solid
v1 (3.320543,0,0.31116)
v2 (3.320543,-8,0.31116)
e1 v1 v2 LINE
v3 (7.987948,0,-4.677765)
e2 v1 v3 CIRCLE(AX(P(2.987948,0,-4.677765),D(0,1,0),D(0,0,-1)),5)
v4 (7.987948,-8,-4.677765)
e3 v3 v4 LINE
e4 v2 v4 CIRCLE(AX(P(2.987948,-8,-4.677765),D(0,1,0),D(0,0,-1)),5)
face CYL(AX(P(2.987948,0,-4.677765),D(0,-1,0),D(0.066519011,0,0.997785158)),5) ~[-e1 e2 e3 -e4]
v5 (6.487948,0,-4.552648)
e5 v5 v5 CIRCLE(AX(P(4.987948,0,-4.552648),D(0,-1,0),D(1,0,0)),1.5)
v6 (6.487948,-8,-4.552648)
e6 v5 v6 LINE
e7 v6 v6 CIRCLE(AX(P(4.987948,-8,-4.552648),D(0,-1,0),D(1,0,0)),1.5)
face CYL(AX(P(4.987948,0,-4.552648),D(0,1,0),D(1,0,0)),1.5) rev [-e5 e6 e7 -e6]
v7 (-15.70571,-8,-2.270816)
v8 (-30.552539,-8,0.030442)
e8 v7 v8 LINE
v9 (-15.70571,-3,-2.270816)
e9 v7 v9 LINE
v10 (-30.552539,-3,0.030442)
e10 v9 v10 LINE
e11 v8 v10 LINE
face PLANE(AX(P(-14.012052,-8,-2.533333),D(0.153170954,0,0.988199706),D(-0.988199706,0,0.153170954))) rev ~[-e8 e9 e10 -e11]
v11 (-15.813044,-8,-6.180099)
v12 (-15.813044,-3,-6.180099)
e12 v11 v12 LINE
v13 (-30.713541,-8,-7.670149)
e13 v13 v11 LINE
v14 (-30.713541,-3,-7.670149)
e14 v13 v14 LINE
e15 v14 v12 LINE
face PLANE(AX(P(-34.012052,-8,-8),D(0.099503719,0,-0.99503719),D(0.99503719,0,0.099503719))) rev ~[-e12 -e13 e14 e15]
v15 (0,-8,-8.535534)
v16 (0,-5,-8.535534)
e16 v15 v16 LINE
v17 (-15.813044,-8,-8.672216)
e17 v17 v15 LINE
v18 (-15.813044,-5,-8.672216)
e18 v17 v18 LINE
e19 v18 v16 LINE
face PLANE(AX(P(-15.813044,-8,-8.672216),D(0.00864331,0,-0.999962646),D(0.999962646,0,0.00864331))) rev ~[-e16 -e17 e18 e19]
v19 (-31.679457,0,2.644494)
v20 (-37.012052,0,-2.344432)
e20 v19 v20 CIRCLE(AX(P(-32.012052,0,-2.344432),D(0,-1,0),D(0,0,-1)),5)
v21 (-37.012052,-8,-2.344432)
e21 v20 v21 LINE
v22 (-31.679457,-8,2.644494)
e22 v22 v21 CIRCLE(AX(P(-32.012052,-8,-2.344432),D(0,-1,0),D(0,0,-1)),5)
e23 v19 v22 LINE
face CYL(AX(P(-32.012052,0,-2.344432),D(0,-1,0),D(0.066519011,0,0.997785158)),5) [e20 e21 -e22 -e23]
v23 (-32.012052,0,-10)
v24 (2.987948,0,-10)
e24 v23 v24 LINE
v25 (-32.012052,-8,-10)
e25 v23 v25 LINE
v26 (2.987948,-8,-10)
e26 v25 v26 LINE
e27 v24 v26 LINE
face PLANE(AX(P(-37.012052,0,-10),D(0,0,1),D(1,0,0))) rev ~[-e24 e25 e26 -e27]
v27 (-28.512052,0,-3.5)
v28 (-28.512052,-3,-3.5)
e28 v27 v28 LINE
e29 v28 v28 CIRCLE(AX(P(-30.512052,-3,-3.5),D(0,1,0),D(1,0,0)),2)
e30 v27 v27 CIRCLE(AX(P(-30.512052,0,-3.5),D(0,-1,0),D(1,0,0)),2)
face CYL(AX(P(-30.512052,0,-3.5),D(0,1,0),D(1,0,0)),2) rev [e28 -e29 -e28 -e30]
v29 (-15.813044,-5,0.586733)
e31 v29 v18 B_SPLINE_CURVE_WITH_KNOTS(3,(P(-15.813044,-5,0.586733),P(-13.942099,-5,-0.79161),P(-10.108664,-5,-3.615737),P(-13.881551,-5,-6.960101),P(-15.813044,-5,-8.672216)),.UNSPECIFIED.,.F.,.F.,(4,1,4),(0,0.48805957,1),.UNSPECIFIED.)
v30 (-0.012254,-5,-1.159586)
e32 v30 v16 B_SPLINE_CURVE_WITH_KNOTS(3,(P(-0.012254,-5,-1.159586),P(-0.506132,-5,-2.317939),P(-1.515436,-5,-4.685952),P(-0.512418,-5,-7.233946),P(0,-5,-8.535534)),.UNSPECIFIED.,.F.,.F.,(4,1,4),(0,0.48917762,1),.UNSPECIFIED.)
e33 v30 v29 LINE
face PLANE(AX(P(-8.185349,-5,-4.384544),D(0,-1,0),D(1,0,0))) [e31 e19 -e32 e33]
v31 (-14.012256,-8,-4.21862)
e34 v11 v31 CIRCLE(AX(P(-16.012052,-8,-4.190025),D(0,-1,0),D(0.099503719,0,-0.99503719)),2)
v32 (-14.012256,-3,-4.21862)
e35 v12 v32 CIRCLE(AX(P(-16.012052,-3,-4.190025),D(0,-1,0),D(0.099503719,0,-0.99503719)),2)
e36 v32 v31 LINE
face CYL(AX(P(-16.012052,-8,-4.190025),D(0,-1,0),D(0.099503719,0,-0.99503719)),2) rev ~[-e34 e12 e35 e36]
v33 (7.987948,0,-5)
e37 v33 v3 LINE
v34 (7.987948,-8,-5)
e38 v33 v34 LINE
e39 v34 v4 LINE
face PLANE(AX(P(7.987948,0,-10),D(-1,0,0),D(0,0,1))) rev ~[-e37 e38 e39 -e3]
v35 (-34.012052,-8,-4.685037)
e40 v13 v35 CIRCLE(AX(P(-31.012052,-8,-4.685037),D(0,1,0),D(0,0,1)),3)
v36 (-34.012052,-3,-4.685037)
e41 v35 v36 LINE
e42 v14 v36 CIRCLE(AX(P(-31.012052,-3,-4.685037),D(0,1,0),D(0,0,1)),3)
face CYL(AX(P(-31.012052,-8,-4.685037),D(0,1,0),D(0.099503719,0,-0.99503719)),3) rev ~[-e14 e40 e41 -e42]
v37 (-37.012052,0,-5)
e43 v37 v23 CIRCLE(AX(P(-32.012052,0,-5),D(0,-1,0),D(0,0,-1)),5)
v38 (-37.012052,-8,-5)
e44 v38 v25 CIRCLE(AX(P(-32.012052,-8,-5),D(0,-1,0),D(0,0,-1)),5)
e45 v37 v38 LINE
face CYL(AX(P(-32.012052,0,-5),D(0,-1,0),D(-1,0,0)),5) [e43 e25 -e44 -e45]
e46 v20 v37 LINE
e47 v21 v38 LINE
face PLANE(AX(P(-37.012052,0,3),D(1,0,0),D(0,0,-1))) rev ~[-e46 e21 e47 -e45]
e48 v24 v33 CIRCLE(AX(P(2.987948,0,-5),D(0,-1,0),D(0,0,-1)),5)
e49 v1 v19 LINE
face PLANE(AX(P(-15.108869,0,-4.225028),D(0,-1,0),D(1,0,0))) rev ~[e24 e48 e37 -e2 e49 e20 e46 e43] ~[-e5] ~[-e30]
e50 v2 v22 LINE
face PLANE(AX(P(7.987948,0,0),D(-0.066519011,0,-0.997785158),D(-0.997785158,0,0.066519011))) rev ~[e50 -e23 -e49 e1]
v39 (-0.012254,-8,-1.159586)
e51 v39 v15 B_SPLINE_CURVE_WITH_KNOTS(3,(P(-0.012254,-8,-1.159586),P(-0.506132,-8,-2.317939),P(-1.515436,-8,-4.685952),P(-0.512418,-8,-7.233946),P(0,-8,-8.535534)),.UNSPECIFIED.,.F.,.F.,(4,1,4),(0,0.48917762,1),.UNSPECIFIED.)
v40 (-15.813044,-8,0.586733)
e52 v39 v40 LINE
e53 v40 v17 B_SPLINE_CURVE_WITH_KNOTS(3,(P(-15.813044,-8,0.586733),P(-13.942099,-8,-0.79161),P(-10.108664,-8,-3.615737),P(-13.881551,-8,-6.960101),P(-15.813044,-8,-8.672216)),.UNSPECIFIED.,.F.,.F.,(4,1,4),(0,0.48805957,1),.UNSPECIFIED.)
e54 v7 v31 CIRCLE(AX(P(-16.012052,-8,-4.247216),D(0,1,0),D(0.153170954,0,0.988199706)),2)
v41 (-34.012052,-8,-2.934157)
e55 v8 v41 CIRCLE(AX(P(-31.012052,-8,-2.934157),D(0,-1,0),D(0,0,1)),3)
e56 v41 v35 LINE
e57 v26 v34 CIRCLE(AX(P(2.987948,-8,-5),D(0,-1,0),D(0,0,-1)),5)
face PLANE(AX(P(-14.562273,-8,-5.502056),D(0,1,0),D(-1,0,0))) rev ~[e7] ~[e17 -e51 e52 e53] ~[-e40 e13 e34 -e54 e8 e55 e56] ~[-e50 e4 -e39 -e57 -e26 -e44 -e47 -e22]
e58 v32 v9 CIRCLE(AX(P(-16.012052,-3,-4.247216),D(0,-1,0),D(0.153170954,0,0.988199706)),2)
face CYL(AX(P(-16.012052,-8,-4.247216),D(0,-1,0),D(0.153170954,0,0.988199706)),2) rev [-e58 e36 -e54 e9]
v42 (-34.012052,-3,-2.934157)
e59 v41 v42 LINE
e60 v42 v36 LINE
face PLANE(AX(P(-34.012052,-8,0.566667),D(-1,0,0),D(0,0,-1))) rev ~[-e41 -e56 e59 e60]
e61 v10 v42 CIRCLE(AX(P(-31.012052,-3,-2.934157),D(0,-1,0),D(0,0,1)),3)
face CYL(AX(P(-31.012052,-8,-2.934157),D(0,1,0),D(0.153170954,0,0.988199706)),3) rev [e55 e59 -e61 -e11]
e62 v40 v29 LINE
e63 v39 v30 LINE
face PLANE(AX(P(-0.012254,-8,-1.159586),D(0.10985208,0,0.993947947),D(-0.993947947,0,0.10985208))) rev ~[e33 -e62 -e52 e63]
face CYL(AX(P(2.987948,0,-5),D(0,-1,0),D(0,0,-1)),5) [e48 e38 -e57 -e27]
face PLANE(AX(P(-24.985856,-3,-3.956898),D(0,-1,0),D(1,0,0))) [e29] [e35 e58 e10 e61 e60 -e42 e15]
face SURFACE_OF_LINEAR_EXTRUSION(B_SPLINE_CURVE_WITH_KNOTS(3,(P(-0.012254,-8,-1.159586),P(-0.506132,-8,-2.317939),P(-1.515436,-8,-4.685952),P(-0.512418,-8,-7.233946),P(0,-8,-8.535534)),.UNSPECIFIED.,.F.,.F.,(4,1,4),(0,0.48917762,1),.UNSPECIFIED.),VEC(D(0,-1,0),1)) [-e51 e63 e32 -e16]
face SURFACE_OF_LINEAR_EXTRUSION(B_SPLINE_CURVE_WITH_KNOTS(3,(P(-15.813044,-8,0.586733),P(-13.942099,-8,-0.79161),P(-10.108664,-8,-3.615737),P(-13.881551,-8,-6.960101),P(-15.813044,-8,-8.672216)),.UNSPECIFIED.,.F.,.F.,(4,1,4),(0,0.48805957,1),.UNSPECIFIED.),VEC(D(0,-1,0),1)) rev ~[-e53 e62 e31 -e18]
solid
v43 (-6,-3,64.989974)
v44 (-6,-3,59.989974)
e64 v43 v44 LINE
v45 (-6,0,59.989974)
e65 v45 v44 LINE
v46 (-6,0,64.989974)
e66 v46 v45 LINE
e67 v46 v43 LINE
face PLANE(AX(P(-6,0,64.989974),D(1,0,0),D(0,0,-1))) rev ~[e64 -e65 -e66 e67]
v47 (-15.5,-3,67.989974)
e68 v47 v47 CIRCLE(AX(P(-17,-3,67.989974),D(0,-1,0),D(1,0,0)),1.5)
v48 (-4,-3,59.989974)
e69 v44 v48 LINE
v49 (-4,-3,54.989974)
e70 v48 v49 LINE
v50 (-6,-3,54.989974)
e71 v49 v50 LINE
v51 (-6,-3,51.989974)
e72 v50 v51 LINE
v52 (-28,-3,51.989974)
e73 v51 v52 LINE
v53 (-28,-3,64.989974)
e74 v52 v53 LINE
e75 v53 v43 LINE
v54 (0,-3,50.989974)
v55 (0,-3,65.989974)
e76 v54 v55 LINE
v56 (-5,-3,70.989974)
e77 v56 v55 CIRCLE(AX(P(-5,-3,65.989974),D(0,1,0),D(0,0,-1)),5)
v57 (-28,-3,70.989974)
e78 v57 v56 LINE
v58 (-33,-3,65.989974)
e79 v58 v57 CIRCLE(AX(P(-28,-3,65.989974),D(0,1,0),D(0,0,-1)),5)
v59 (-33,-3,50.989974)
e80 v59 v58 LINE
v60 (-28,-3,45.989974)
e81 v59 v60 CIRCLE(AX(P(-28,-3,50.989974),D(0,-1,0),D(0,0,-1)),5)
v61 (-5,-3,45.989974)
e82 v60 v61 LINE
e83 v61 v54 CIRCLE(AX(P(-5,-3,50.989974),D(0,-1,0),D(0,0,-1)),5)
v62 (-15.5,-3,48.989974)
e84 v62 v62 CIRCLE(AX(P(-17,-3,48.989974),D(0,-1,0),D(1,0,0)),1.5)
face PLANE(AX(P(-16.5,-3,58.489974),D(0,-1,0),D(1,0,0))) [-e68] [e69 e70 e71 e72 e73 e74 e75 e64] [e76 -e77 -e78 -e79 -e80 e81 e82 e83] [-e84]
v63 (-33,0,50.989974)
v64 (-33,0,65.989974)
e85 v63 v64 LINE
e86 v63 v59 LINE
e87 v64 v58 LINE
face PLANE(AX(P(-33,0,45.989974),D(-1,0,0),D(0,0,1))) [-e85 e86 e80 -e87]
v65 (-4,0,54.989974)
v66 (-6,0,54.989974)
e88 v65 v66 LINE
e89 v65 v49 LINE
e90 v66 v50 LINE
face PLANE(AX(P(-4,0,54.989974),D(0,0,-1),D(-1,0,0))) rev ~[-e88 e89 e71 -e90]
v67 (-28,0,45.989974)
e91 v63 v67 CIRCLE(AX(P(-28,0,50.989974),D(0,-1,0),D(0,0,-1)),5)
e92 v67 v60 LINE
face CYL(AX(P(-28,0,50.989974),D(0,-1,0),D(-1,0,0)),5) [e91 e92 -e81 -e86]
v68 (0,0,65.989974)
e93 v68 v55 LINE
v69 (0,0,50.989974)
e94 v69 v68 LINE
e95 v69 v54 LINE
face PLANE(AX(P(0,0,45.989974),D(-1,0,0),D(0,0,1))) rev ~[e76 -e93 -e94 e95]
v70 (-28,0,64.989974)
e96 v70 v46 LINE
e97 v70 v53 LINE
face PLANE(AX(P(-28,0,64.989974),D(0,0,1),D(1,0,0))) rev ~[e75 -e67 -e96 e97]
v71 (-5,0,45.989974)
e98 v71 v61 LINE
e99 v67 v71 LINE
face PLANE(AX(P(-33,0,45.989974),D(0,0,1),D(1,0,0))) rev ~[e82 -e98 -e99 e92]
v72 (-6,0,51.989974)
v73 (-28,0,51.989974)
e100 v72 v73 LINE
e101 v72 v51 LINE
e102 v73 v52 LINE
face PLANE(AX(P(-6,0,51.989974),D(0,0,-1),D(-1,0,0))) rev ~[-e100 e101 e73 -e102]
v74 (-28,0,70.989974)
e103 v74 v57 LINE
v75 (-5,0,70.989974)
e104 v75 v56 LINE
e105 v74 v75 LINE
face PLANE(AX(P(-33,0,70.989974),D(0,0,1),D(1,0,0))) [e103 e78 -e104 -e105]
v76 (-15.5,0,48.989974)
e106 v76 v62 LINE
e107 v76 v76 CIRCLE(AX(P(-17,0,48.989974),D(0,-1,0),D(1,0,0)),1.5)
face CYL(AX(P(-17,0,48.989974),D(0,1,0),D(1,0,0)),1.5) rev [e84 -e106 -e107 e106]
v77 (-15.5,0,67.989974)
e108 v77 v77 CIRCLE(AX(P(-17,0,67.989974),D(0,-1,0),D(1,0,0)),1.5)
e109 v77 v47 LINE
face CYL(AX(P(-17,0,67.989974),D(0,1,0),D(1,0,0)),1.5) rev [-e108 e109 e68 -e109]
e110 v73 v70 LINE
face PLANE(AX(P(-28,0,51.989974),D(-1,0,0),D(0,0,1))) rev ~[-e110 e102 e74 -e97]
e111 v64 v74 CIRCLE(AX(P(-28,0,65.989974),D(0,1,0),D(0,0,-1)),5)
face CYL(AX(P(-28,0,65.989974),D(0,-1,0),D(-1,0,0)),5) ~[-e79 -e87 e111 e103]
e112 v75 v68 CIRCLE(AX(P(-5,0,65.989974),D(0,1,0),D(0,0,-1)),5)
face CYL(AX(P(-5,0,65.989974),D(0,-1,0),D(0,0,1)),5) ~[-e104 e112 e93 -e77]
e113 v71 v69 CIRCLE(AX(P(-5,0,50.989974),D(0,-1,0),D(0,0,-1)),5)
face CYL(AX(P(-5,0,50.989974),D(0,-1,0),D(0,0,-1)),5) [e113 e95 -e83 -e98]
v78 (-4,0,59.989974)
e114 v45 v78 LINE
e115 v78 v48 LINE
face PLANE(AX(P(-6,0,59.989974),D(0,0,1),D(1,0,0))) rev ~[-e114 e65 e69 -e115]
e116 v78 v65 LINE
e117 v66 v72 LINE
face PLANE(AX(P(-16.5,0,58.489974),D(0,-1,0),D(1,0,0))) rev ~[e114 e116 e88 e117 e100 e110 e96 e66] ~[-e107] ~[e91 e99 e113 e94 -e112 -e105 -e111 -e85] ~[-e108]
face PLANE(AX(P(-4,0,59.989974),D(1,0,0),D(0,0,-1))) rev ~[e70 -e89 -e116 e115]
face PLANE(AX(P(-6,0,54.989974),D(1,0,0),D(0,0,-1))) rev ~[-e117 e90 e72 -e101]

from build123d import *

# Parameters (mm, degrees)
F0_R        = 1.5
F0_R_2      = 2
F1_DEPTH    = 8
F2_R        = 5
F3_R        = 5
F5_DEPTH    = 5
F6_R        = 3
F7_T4_DEPTH = 9.2847060191
F7_T9_DEPTH = 9.5249378106
F9_DEPTH    = 3
F10_W       = 33
F10_H       = 25
F10_R       = 1.5
F11_DEPTH   = 3
F12_R       = 5


# Not quite as in the source:
# - a fillet or chamfer that OpenCascade refuses, or shapes differently, is made with other operations: its cross-section is extruded or revolved along the edge and cut away or added


with BuildPart() as f1:
    # F0 (on Front) → F1 (new body)
    with BuildSketch(Plane.XZ):
        Polygon((-37.012051791, 3), (-37.012051791, -10), (7.987948209, -10), (7.987948209, 0), align=None)
        with Locations((4.987948209, -4.5526479371)):
            Circle(F0_R, mode=Mode.SUBTRACT)
        with Locations((-30.512051791, -3.5)):
            Circle(F0_R_2, mode=Mode.SUBTRACT)
    extrude(amount=F1_DEPTH)

    # F2
    f2_edges = [f1.edges().sort_by_distance(p)[0] for p in [
        (7.987948, -4, 0),
        (7.987948, -4, -10),
    ]]
    fillet(f2_edges, radius=F2_R)

    # F3
    f3_edges = [f1.edges().sort_by_distance(p)[0] for p in [
        (-37.012052, -4, 3),
        (-37.012052, -4, -10),
    ]]
    fillet(f3_edges, radius=F3_R)

    # F4 (on face) → F5 (cut)
    with BuildSketch(Plane.XZ.offset(8)):
        Polygon((-34.012051791, -8), (-14.012051791, -6), (-14.012051791, -2.5333333333), (-34.012051791, 0.5666666667), align=None)
    extrude(amount=-F5_DEPTH, mode=Mode.SUBTRACT)

    # F6
    f6_edges = [f1.edges().sort_by_distance(p)[0] for p in [
        (-34.012052, -5.5, 0.566667),
        (-34.012052, -5.5, -8),
    ]]
    fillet(f6_edges, radius=F6_R)

    # F7: fillet of radius 2 on 2 edges, made by hand


with BuildPart() as f7_tool2:
    # F7_s3 → F7_t4 (new body)
    with BuildSketch(Plane.XZ.offset(8)):
        with BuildLine():
            ThreePointArc((-15.7057098821, -2.2708163292), (-14.493387276, -2.9458095434), (-14.012051791, -4.247215741))
            Line((-14.012051791, -4.247215741), (-14.012051791, -2.5333333333))
            Line((-14.012051791, -2.5333333333), (-15.7057098821, -2.2708163292))
        make_face()
    extrude(amount=-F7_T4_DEPTH)

    split(bisect_by=Plane.XZ, keep=Keep.TOP)


with BuildPart() as f1_1:
    add(f1.part)

    # F7_t1: union F7_tool2
    add(f7_tool2.part)


with BuildPart() as f7_tool7:
    # F7_s8 → F7_t9 (new body)
    with BuildSketch(Plane.XZ.offset(8)):
        with BuildLine():
            ThreePointArc((-15.8130443529, -6.1800992562), (-14.5291467238, -5.5320355173), (-14.012051791, -4.1900248758))
            Line((-14.012051791, -4.1900248758), (-14.012051791, -6))
            Line((-14.012051791, -6), (-15.8130443529, -6.1800992562))
        make_face()
    extrude(amount=-F7_T9_DEPTH)

    split(bisect_by=Plane.XZ, keep=Keep.TOP)


with BuildPart() as f1_2:
    add(f1_1.part)

    # F7_t6: union F7_tool7
    add(f7_tool7.part)

    # F8 (on face) → F9 (cut)
    with BuildSketch(Plane.XZ.offset(8)):
        with BuildLine():
            Line((-0.0122538466, -1.1595856835), (-15.8130443529, 0.5867328375))
            add(Edge.make_bspline(
                [(-15.8130443529, 0.5867328375), (-13.9420993532, -0.7916096765), (-10.1086636088, -3.615737303), (-13.88155084, -6.9601010481), (-15.8130443529, -8.6722160631)],
                knots=[0, 0, 0, 0, 0.4880595696, 1, 1, 1, 1], degree=3))
            Line((-15.8130443529, -8.6722160631), (0, -8.5355339059))
            add(Edge.make_bspline(
                [(-0.0122538466, -1.1595856835), (-0.5061323056, -2.3179393868), (-1.5154357631, -4.6859516385), (-0.5124182093, -7.2339464419), (0, -8.5355339059)],
                knots=[0, 0, 0, 0, 0.4891776198, 1, 1, 1, 1], degree=3))
        make_face()
    extrude(amount=-F9_DEPTH, mode=Mode.SUBTRACT)


with BuildPart() as f11:
    # F10 (on Front) → F11 (new body)
    with BuildSketch(Plane.XZ):
        with Locations((-16.5, 58.4899739623)):
            Rectangle(F10_W, F10_H)
        with Locations((-17, 48.9899739623)):
            Circle(F10_R, mode=Mode.SUBTRACT)
        Polygon((-6, 51.9899739623), (-28, 51.9899739623), (-28, 64.9899739623), (-6, 64.9899739623), (-6, 59.9899739623), (-4, 59.9899739623), (-4, 54.9899739623), (-6, 54.9899739623), align=None, mode=Mode.SUBTRACT)
        with Locations((-17, 67.9899739623)):
            Circle(F10_R, mode=Mode.SUBTRACT)
    extrude(amount=F11_DEPTH)

    # F12
    f12_edges = [f11.edges().sort_by_distance(p)[0] for p in [
        (-33, -1.5, 70.989974),
        (-33, -1.5, 45.989974),
        (0, -1.5, 45.989974),
        (0, -1.5, 70.989974),
    ]]
    fillet(f12_edges, radius=F12_R)


solid = Compound([f1_2.part, f11.part])
